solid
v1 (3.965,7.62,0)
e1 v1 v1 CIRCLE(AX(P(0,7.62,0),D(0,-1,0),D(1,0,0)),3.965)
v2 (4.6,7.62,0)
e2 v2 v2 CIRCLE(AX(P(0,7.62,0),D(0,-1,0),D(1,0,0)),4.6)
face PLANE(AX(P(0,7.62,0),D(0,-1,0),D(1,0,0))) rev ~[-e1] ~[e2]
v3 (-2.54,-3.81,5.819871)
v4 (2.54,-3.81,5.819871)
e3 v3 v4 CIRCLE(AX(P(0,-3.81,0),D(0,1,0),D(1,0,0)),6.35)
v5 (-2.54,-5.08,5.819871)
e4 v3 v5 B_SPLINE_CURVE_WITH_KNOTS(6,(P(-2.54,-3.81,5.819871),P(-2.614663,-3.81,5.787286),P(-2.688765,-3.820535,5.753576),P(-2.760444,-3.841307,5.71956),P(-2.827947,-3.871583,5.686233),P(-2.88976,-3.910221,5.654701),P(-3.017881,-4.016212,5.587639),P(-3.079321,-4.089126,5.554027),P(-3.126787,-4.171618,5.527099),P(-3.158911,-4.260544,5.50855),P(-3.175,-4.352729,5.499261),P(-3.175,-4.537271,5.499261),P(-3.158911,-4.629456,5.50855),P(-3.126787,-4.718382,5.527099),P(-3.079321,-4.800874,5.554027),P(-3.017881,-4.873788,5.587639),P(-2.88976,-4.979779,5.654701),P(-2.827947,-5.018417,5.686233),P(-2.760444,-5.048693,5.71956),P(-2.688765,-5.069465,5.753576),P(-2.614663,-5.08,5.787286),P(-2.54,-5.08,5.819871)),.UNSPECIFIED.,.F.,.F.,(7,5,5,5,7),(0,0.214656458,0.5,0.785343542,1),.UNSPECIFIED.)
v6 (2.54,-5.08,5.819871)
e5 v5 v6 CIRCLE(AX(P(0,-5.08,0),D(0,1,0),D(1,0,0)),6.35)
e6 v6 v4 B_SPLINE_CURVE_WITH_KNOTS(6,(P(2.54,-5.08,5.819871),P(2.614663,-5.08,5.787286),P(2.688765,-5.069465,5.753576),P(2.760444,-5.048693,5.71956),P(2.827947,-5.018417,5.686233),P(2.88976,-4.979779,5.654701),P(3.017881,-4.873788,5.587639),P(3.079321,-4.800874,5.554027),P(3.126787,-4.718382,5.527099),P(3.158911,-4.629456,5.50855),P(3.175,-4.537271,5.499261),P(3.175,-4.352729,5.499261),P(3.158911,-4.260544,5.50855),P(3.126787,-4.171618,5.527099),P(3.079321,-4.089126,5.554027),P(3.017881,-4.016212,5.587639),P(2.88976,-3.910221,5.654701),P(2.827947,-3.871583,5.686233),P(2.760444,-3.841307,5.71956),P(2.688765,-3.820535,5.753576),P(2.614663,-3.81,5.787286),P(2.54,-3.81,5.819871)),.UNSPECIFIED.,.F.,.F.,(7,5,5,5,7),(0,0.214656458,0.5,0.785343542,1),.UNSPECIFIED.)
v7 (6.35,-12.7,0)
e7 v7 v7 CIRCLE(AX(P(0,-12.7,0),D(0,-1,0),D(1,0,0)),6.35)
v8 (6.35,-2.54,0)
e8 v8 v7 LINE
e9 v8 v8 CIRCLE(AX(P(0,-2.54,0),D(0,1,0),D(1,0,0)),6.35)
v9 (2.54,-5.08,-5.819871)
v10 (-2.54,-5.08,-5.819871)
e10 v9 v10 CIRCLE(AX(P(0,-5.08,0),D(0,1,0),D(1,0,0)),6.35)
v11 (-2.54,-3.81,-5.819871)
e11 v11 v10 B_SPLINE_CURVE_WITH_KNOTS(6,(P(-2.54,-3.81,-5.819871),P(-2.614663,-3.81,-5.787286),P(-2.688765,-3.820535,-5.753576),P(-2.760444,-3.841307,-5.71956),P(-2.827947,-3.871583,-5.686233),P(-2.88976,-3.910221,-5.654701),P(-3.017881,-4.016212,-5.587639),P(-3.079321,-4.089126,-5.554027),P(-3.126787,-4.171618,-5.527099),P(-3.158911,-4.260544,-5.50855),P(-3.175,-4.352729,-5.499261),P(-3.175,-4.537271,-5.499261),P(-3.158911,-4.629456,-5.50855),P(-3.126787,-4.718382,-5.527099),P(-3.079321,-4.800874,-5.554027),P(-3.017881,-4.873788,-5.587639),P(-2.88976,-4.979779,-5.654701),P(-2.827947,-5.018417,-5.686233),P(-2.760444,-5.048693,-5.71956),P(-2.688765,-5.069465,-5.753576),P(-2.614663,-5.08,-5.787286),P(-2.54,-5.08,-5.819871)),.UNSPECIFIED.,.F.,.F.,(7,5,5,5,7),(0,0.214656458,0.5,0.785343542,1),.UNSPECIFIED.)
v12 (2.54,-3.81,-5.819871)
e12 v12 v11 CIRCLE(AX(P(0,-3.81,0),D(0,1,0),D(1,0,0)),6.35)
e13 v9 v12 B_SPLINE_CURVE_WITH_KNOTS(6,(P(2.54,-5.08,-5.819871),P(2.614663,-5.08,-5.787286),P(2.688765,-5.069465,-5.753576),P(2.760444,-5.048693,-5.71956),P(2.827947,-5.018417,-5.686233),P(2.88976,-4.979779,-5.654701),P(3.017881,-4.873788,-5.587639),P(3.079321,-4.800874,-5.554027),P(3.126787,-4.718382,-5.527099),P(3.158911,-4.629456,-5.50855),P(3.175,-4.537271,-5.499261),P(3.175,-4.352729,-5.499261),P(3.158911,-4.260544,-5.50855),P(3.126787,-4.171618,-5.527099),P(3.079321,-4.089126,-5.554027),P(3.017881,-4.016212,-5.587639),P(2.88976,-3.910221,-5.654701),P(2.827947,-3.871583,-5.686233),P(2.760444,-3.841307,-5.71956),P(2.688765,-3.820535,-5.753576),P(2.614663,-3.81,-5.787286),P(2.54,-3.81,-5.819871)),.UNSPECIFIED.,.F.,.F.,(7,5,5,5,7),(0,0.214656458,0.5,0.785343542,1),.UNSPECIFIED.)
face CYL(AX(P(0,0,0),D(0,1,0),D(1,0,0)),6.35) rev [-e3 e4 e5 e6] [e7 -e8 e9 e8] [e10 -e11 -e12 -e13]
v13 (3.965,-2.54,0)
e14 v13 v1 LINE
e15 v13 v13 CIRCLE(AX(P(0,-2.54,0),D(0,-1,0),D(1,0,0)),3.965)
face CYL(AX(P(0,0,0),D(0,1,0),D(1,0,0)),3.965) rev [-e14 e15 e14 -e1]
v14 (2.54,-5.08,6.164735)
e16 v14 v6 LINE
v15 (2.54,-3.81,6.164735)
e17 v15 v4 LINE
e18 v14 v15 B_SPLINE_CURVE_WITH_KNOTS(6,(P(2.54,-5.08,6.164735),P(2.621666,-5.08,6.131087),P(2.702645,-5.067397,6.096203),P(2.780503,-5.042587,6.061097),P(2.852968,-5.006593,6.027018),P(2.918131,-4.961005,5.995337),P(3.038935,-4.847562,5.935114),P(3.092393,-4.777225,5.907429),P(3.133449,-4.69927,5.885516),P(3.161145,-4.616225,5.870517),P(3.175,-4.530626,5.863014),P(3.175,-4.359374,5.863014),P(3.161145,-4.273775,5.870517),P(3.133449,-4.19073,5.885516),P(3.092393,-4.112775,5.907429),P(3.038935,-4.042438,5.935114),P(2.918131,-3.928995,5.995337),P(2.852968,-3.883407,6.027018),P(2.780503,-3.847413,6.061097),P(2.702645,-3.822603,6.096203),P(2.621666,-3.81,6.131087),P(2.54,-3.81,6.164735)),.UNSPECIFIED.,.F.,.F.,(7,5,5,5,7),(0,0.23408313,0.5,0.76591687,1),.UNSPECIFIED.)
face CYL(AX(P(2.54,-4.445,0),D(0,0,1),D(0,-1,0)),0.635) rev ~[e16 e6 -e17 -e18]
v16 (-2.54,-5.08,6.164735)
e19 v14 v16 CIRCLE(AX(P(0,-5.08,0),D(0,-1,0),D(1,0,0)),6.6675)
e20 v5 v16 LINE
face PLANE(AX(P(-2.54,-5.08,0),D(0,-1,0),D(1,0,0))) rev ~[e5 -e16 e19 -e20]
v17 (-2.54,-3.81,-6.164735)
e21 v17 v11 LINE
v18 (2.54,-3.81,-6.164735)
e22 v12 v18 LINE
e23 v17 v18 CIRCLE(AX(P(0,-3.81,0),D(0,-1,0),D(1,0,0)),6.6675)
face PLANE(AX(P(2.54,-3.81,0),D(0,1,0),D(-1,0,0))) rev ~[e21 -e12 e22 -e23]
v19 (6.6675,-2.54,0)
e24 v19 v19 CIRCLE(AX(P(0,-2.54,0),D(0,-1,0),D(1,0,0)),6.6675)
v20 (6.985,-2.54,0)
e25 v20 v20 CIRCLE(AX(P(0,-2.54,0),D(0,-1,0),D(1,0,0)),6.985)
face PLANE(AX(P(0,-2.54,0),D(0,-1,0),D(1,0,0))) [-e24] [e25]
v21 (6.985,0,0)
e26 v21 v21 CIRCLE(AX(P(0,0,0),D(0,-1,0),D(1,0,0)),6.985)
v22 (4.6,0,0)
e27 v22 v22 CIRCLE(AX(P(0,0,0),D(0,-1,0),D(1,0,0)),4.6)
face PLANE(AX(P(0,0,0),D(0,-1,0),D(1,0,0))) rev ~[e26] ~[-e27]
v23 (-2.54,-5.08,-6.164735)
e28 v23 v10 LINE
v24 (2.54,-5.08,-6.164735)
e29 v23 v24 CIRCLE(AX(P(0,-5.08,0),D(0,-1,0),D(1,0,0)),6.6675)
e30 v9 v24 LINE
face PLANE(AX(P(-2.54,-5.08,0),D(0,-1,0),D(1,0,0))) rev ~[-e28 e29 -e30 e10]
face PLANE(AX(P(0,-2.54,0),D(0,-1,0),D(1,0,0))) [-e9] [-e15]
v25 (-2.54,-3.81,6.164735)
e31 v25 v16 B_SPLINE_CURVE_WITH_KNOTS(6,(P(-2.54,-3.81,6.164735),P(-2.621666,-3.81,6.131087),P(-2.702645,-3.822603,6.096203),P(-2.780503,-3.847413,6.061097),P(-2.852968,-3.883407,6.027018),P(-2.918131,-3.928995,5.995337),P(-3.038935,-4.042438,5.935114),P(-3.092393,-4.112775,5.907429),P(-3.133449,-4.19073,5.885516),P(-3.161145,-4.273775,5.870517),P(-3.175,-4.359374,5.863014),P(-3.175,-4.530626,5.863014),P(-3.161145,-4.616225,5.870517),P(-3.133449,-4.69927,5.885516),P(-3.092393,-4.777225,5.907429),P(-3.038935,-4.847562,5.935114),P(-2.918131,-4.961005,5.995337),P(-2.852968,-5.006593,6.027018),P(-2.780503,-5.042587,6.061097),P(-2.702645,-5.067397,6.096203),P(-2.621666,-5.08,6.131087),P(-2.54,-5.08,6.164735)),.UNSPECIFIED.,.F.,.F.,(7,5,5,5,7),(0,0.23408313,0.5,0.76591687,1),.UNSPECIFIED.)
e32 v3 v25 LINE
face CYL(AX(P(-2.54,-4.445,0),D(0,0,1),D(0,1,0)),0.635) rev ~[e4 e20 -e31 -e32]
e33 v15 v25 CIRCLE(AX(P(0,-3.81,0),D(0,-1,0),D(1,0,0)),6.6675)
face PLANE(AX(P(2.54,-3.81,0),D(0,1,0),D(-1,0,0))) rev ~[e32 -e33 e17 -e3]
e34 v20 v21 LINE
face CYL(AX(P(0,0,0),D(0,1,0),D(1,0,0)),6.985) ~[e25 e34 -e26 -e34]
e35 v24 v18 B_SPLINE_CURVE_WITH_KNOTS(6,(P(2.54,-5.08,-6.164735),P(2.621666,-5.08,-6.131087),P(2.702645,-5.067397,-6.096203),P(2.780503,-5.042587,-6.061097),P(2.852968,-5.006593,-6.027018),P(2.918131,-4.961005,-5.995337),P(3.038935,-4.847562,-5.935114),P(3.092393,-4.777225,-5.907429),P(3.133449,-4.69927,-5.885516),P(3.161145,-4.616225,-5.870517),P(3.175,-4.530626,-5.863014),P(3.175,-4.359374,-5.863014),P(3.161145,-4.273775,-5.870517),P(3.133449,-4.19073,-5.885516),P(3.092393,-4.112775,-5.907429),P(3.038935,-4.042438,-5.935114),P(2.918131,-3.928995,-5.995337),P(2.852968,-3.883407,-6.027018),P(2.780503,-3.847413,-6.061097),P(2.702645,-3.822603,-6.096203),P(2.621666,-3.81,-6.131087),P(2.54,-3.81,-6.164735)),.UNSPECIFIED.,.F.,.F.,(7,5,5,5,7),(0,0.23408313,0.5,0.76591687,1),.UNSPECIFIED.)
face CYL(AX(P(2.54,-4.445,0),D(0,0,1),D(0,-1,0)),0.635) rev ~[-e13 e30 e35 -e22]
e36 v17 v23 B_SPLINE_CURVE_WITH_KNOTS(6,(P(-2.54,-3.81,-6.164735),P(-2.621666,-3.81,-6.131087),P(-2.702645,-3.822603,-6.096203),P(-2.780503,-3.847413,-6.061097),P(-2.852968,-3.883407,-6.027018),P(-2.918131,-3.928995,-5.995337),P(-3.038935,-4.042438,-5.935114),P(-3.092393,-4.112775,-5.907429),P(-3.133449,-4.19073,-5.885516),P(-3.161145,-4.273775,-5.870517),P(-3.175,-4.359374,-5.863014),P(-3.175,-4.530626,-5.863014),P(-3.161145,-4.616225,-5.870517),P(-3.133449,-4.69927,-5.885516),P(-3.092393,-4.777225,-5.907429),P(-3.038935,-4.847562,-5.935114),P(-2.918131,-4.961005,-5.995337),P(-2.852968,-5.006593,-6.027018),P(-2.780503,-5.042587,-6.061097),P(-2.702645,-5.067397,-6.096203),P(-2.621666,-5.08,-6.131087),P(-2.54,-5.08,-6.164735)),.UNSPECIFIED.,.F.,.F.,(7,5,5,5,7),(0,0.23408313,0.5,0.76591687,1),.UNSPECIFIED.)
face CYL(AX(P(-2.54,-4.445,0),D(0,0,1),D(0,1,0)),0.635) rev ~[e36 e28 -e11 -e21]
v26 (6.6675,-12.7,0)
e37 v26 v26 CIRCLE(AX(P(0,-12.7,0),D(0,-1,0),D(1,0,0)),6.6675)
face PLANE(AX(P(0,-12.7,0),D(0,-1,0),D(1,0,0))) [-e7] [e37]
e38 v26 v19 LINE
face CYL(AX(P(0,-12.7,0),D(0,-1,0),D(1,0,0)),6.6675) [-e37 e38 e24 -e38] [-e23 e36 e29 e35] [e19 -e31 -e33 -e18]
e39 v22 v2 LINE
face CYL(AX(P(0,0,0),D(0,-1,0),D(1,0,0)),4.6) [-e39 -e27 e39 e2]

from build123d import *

# Parameters (mm, degrees)
F0_R     = 4.6
F0_R_2   = 3.965
F1_DEPTH = 7.62
F0_R_3   = 6.985
F0_R_4   = 6.35
F2_DEPTH = 2.54
F3_DEPTH = 12.7
F5_R     = 6.985
F5_R_2   = 6.6675
F6_DEPTH = 10.16
F7_DEPTH = 6.82625


# Not quite as in the source:
# - a feature names something its author has since deleted; it is built from what else it names


with BuildPart() as f1:
    # F0 (on Front) → F1 (new body)
    with BuildSketch(Plane.XZ):
        Circle(F0_R)
        Circle(F0_R_2, mode=Mode.SUBTRACT)
    extrude(amount=-F1_DEPTH)

    # F0 (on Front) → F2 (join)
    with BuildSketch(Plane.XZ):
        Circle(F0_R_3)
        Circle(F0_R_4, mode=Mode.SUBTRACT)
        Circle(F0_R_4)
        Circle(F0_R, mode=Mode.SUBTRACT)
        Circle(F0_R)
        Circle(F0_R_2, mode=Mode.SUBTRACT)
    extrude(amount=F2_DEPTH)

    # F0 (on Front) → F3 (join)
    with BuildSketch(Plane.XZ):
        Circle(F0_R_3)
        Circle(F0_R_4, mode=Mode.SUBTRACT)
    extrude(amount=F3_DEPTH)

    # F5 (on face) → F6 (cut)
    with BuildSketch(Plane.XZ.offset(12.7)):
        Circle(F5_R)
        Circle(F5_R_2, mode=Mode.SUBTRACT)
    extrude(amount=-F6_DEPTH, mode=Mode.SUBTRACT)

    # F4 (on Top) → F7 (cut, symmetric)
    with BuildSketch(Plane.XY):
        with BuildLine():
            Line((2.54, -3.81), (0, -3.81))
            Line((0, -3.81), (-2.54, -3.81))
            ThreePointArc((-2.54, -3.81), (-3.175, -4.445), (-2.54, -5.08))
            Line((-2.54, -5.08), (0, -5.08))
            Line((0, -5.08), (2.54, -5.08))
            ThreePointArc((2.54, -5.08), (3.175, -4.445), (2.54, -3.81))
        make_face()
    extrude(amount=F7_DEPTH, both=True, mode=Mode.SUBTRACT)


solid = f1.part
